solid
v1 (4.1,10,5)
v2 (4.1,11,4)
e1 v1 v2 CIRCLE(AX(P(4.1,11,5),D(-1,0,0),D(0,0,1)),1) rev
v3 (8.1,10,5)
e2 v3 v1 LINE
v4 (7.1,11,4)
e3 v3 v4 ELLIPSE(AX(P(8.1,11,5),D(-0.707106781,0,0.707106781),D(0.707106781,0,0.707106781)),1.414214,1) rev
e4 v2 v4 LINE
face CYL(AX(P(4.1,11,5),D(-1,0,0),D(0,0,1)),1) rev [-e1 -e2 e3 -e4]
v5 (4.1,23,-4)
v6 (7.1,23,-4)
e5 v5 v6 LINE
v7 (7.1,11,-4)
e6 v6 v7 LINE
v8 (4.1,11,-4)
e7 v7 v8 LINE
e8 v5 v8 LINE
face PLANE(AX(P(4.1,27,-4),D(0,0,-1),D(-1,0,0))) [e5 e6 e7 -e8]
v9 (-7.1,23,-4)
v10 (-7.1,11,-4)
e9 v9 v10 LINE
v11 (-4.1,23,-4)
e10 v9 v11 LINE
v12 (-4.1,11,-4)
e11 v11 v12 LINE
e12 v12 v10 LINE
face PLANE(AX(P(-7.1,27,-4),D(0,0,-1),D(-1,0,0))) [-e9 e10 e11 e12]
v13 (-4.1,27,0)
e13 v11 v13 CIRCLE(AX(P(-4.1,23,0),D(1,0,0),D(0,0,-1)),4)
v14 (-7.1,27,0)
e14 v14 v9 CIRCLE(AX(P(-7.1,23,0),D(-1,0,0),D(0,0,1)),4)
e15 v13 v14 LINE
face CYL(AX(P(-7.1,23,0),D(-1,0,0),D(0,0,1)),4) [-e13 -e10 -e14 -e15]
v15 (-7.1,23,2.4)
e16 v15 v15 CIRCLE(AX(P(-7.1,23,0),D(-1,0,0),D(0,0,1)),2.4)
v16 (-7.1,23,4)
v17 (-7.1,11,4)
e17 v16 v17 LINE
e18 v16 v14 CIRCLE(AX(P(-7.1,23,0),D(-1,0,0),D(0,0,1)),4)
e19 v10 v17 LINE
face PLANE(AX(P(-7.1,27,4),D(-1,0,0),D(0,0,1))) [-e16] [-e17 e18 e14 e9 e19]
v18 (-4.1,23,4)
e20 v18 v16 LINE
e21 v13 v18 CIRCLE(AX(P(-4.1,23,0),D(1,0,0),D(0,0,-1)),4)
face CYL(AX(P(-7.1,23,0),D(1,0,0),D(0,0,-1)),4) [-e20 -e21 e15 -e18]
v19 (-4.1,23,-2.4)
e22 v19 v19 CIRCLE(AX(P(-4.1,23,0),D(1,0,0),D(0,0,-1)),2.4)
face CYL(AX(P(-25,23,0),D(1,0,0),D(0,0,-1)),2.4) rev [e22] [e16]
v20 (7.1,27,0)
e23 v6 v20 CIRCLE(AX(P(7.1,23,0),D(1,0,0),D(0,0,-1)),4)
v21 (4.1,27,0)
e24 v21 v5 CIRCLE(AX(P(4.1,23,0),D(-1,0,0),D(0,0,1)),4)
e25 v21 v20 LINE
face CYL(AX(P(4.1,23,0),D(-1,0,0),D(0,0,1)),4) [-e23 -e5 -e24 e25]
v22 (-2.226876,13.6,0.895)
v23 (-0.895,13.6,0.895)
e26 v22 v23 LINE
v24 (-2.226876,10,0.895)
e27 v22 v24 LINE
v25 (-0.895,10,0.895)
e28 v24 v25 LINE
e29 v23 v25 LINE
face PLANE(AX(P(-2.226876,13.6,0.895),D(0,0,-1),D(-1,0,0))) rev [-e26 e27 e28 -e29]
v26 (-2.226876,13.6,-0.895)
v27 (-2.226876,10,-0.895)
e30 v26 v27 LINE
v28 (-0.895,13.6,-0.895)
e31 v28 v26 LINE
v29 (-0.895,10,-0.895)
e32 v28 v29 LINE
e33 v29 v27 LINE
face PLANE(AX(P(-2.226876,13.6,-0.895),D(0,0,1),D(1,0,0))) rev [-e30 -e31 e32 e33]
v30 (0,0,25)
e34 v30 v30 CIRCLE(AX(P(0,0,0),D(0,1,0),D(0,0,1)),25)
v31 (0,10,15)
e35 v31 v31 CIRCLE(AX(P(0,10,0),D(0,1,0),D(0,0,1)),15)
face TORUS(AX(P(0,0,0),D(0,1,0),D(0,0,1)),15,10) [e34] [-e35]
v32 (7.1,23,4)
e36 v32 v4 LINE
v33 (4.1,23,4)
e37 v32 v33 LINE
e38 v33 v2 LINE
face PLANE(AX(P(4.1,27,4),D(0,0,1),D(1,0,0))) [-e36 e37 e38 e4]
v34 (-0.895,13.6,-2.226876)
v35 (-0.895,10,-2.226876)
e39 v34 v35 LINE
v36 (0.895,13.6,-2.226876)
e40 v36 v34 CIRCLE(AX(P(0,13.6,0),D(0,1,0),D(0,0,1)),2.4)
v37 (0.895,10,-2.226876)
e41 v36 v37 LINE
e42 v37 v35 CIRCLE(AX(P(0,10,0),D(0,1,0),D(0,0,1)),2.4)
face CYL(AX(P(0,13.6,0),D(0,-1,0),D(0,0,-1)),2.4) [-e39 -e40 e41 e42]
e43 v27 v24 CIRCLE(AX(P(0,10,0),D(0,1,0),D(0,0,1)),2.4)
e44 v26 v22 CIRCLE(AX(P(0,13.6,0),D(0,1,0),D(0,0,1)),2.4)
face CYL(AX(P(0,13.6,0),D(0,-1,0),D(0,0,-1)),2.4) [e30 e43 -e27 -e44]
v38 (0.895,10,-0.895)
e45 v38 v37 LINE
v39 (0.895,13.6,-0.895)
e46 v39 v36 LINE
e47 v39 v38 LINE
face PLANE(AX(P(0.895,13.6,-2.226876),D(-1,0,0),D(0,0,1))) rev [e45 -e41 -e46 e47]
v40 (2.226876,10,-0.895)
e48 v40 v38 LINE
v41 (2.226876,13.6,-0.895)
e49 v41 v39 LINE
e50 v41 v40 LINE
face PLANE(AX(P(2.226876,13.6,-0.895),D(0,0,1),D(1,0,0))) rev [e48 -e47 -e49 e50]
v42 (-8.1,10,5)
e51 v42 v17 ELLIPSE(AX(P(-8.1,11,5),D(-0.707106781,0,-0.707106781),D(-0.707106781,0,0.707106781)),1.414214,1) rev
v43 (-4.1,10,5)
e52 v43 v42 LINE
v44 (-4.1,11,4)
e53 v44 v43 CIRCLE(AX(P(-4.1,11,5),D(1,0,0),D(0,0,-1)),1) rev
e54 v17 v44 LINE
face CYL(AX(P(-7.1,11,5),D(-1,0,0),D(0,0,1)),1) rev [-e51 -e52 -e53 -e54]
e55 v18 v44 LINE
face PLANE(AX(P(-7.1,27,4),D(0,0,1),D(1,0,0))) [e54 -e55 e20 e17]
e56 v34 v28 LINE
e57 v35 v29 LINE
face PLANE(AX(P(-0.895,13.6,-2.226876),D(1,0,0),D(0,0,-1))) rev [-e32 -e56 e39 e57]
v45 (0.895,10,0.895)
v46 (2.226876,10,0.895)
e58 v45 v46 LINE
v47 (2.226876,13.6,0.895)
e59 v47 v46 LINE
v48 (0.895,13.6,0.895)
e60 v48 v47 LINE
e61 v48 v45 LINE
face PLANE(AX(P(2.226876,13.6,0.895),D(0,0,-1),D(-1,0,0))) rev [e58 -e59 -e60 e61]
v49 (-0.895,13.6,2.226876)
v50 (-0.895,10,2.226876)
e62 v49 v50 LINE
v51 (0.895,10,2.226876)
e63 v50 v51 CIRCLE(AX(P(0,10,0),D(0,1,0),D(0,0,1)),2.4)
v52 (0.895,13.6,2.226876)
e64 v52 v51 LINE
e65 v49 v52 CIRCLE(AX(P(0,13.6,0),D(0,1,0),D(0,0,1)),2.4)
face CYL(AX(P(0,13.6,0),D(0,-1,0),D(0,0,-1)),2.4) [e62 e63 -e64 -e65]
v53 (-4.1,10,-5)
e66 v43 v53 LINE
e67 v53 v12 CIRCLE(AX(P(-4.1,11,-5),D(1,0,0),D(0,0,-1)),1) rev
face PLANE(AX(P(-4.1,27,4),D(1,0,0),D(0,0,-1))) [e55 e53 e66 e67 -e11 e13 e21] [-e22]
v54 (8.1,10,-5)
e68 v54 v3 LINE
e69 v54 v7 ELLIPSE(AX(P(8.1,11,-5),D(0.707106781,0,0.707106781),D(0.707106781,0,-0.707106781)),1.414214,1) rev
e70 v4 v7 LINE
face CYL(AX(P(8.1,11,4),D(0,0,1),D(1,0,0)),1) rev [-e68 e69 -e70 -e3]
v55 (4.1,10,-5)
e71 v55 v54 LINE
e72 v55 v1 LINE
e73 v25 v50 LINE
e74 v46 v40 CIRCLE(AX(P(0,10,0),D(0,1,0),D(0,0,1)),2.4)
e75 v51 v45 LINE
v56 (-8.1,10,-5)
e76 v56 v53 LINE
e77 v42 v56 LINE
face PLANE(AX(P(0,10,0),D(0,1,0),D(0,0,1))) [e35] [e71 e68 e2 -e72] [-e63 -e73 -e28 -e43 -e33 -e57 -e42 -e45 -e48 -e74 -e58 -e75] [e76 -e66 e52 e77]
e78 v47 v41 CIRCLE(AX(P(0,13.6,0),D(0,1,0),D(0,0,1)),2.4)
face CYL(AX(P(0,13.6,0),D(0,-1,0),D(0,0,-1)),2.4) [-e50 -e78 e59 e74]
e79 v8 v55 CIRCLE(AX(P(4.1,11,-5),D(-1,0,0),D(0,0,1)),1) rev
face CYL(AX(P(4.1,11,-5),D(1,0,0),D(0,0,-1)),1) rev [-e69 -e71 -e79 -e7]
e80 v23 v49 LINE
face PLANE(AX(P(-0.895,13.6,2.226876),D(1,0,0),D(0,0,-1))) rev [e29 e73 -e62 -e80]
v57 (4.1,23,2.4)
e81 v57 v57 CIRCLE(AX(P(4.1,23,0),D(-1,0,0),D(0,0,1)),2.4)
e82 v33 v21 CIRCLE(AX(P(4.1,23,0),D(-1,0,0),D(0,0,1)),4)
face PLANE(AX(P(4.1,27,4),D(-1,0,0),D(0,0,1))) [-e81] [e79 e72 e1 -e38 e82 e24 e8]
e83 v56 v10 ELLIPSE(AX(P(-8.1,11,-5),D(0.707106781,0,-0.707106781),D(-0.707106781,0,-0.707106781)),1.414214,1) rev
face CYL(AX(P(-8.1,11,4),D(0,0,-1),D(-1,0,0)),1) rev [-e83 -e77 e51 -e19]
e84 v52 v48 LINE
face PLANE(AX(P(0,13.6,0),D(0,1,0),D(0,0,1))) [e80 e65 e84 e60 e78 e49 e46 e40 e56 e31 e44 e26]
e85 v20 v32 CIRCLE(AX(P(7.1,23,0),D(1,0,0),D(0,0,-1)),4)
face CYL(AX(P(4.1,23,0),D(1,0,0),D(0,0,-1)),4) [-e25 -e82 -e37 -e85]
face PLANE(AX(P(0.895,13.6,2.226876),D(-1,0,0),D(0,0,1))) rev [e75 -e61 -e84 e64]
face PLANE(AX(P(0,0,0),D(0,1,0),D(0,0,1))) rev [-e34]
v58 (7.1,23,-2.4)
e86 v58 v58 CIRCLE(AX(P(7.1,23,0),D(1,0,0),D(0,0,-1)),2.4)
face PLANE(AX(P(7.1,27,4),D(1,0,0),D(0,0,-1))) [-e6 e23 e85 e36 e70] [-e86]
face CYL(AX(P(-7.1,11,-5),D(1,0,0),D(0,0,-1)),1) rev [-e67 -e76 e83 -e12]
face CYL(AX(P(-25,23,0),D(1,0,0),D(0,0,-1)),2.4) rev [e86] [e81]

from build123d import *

# Parameters (mm, degrees)
SKETCH1_R           = 25
BOSS_EXTRUDE1_DEPTH = 10
FILLET1_R           = 10
BOSS_EXTRUDE2_DEPTH = 3.6
SKETCH3_W           = 3
SKETCH3_H           = 8
BOSS_EXTRUDE3_DEPTH = 27
SKETCH4_R           = 2.4
CUT_EXTRUDE1_DEPTH  = 49.830420846
FILLET2_R           = 4
FILLET3_R           = 1


with BuildPart() as part:
    # Sketch1 → Boss-Extrude1 (new body)
    with BuildSketch(Plane(origin=(0, 0, 0), x_dir=(1, 0, 0), z_dir=(0, 1, 0))):
        with Locations(Location((0, 0, 0), (0, 0, 270))):
            Circle(SKETCH1_R)
    extrude(amount=BOSS_EXTRUDE1_DEPTH)

    # Fillet1
    fillet1_edges = [part.edges().sort_by_distance(p)[0] for p in [
        (0, 10, -25),
    ]]
    fillet(fillet1_edges, radius=FILLET1_R - 0.0001)  # a hair under: the kernel refuses the full size

    # Sketch2 → Boss-Extrude2 (add)
    with BuildSketch(Plane(origin=(0, 10, 0), x_dir=(1, 0, 0), z_dir=(0, 1, 0))):
        with BuildLine():
            Line((-2.226875614, -0.895), (-0.895, -0.895))
            Line((-0.895, -0.895), (-0.895, -2.226875614))
            ThreePointArc((-0.895, -2.226875614), (0, -2.4), (0.895, -2.226875614))
            Line((0.895, -2.226875614), (0.895, -0.895))
            Line((0.895, -0.895), (2.226875614, -0.895))
            ThreePointArc((2.226875614, -0.895), (2.4, 0), (2.226875614, 0.895))
            Line((2.226875614, 0.895), (0.895, 0.895))
            Line((0.895, 0.895), (0.895, 2.226875614))
            ThreePointArc((0.895, 2.226875614), (0, 2.4), (-0.895, 2.226875614))
            Line((-0.895, 2.226875614), (-0.895, 0.895))
            Line((-0.895, 0.895), (-2.226875614, 0.895))
            ThreePointArc((-2.226875614, 0.895), (-2.4, 0), (-2.226875614, -0.895))
        make_face()
    extrude(amount=BOSS_EXTRUDE2_DEPTH)

    # Sketch3 → Boss-Extrude3 (add)
    with BuildSketch(Plane.XZ):
        with Locations((-5.6, 0)):
            Rectangle(SKETCH3_W, SKETCH3_H)
        with Locations((5.6, 0)):
            Rectangle(SKETCH3_W, SKETCH3_H)
    extrude(amount=-BOSS_EXTRUDE3_DEPTH)

    # Sketch4 → Cut-Extrude1 (cut, through all)
    with BuildSketch(Plane(origin=(7.1, 0, 0), x_dir=(0, 0, -1), z_dir=(1, 0, 0))):
        with Locations((0, 23)):
            Circle(SKETCH4_R)
    extrude(amount=-CUT_EXTRUDE1_DEPTH, mode=Mode.SUBTRACT)

    # Fillet2
    fillet2_edges = [part.edges().sort_by_distance(p)[0] for p in [
        (5.6, 27, -4),
        (5.6, 27, 4),
        (-5.6, 27, 4),
        (-5.6, 27, -4),
    ]]
    fillet(fillet2_edges, radius=FILLET2_R - 0.0001)  # a hair under: the kernel refuses the full size

    # Fillet3
    fillet3_edges = [part.edges().sort_by_distance(p)[0] for p in [
        (-7.1, 10, 0),
        (-5.6, 10, 4),
        (-5.6, 10, -4),
        (5.6, 10, 4),
        (7.1, 10, 0),
        (5.6, 10, -4),
    ]]
    fillet(fillet3_edges, radius=FILLET3_R)


solid = part.part
